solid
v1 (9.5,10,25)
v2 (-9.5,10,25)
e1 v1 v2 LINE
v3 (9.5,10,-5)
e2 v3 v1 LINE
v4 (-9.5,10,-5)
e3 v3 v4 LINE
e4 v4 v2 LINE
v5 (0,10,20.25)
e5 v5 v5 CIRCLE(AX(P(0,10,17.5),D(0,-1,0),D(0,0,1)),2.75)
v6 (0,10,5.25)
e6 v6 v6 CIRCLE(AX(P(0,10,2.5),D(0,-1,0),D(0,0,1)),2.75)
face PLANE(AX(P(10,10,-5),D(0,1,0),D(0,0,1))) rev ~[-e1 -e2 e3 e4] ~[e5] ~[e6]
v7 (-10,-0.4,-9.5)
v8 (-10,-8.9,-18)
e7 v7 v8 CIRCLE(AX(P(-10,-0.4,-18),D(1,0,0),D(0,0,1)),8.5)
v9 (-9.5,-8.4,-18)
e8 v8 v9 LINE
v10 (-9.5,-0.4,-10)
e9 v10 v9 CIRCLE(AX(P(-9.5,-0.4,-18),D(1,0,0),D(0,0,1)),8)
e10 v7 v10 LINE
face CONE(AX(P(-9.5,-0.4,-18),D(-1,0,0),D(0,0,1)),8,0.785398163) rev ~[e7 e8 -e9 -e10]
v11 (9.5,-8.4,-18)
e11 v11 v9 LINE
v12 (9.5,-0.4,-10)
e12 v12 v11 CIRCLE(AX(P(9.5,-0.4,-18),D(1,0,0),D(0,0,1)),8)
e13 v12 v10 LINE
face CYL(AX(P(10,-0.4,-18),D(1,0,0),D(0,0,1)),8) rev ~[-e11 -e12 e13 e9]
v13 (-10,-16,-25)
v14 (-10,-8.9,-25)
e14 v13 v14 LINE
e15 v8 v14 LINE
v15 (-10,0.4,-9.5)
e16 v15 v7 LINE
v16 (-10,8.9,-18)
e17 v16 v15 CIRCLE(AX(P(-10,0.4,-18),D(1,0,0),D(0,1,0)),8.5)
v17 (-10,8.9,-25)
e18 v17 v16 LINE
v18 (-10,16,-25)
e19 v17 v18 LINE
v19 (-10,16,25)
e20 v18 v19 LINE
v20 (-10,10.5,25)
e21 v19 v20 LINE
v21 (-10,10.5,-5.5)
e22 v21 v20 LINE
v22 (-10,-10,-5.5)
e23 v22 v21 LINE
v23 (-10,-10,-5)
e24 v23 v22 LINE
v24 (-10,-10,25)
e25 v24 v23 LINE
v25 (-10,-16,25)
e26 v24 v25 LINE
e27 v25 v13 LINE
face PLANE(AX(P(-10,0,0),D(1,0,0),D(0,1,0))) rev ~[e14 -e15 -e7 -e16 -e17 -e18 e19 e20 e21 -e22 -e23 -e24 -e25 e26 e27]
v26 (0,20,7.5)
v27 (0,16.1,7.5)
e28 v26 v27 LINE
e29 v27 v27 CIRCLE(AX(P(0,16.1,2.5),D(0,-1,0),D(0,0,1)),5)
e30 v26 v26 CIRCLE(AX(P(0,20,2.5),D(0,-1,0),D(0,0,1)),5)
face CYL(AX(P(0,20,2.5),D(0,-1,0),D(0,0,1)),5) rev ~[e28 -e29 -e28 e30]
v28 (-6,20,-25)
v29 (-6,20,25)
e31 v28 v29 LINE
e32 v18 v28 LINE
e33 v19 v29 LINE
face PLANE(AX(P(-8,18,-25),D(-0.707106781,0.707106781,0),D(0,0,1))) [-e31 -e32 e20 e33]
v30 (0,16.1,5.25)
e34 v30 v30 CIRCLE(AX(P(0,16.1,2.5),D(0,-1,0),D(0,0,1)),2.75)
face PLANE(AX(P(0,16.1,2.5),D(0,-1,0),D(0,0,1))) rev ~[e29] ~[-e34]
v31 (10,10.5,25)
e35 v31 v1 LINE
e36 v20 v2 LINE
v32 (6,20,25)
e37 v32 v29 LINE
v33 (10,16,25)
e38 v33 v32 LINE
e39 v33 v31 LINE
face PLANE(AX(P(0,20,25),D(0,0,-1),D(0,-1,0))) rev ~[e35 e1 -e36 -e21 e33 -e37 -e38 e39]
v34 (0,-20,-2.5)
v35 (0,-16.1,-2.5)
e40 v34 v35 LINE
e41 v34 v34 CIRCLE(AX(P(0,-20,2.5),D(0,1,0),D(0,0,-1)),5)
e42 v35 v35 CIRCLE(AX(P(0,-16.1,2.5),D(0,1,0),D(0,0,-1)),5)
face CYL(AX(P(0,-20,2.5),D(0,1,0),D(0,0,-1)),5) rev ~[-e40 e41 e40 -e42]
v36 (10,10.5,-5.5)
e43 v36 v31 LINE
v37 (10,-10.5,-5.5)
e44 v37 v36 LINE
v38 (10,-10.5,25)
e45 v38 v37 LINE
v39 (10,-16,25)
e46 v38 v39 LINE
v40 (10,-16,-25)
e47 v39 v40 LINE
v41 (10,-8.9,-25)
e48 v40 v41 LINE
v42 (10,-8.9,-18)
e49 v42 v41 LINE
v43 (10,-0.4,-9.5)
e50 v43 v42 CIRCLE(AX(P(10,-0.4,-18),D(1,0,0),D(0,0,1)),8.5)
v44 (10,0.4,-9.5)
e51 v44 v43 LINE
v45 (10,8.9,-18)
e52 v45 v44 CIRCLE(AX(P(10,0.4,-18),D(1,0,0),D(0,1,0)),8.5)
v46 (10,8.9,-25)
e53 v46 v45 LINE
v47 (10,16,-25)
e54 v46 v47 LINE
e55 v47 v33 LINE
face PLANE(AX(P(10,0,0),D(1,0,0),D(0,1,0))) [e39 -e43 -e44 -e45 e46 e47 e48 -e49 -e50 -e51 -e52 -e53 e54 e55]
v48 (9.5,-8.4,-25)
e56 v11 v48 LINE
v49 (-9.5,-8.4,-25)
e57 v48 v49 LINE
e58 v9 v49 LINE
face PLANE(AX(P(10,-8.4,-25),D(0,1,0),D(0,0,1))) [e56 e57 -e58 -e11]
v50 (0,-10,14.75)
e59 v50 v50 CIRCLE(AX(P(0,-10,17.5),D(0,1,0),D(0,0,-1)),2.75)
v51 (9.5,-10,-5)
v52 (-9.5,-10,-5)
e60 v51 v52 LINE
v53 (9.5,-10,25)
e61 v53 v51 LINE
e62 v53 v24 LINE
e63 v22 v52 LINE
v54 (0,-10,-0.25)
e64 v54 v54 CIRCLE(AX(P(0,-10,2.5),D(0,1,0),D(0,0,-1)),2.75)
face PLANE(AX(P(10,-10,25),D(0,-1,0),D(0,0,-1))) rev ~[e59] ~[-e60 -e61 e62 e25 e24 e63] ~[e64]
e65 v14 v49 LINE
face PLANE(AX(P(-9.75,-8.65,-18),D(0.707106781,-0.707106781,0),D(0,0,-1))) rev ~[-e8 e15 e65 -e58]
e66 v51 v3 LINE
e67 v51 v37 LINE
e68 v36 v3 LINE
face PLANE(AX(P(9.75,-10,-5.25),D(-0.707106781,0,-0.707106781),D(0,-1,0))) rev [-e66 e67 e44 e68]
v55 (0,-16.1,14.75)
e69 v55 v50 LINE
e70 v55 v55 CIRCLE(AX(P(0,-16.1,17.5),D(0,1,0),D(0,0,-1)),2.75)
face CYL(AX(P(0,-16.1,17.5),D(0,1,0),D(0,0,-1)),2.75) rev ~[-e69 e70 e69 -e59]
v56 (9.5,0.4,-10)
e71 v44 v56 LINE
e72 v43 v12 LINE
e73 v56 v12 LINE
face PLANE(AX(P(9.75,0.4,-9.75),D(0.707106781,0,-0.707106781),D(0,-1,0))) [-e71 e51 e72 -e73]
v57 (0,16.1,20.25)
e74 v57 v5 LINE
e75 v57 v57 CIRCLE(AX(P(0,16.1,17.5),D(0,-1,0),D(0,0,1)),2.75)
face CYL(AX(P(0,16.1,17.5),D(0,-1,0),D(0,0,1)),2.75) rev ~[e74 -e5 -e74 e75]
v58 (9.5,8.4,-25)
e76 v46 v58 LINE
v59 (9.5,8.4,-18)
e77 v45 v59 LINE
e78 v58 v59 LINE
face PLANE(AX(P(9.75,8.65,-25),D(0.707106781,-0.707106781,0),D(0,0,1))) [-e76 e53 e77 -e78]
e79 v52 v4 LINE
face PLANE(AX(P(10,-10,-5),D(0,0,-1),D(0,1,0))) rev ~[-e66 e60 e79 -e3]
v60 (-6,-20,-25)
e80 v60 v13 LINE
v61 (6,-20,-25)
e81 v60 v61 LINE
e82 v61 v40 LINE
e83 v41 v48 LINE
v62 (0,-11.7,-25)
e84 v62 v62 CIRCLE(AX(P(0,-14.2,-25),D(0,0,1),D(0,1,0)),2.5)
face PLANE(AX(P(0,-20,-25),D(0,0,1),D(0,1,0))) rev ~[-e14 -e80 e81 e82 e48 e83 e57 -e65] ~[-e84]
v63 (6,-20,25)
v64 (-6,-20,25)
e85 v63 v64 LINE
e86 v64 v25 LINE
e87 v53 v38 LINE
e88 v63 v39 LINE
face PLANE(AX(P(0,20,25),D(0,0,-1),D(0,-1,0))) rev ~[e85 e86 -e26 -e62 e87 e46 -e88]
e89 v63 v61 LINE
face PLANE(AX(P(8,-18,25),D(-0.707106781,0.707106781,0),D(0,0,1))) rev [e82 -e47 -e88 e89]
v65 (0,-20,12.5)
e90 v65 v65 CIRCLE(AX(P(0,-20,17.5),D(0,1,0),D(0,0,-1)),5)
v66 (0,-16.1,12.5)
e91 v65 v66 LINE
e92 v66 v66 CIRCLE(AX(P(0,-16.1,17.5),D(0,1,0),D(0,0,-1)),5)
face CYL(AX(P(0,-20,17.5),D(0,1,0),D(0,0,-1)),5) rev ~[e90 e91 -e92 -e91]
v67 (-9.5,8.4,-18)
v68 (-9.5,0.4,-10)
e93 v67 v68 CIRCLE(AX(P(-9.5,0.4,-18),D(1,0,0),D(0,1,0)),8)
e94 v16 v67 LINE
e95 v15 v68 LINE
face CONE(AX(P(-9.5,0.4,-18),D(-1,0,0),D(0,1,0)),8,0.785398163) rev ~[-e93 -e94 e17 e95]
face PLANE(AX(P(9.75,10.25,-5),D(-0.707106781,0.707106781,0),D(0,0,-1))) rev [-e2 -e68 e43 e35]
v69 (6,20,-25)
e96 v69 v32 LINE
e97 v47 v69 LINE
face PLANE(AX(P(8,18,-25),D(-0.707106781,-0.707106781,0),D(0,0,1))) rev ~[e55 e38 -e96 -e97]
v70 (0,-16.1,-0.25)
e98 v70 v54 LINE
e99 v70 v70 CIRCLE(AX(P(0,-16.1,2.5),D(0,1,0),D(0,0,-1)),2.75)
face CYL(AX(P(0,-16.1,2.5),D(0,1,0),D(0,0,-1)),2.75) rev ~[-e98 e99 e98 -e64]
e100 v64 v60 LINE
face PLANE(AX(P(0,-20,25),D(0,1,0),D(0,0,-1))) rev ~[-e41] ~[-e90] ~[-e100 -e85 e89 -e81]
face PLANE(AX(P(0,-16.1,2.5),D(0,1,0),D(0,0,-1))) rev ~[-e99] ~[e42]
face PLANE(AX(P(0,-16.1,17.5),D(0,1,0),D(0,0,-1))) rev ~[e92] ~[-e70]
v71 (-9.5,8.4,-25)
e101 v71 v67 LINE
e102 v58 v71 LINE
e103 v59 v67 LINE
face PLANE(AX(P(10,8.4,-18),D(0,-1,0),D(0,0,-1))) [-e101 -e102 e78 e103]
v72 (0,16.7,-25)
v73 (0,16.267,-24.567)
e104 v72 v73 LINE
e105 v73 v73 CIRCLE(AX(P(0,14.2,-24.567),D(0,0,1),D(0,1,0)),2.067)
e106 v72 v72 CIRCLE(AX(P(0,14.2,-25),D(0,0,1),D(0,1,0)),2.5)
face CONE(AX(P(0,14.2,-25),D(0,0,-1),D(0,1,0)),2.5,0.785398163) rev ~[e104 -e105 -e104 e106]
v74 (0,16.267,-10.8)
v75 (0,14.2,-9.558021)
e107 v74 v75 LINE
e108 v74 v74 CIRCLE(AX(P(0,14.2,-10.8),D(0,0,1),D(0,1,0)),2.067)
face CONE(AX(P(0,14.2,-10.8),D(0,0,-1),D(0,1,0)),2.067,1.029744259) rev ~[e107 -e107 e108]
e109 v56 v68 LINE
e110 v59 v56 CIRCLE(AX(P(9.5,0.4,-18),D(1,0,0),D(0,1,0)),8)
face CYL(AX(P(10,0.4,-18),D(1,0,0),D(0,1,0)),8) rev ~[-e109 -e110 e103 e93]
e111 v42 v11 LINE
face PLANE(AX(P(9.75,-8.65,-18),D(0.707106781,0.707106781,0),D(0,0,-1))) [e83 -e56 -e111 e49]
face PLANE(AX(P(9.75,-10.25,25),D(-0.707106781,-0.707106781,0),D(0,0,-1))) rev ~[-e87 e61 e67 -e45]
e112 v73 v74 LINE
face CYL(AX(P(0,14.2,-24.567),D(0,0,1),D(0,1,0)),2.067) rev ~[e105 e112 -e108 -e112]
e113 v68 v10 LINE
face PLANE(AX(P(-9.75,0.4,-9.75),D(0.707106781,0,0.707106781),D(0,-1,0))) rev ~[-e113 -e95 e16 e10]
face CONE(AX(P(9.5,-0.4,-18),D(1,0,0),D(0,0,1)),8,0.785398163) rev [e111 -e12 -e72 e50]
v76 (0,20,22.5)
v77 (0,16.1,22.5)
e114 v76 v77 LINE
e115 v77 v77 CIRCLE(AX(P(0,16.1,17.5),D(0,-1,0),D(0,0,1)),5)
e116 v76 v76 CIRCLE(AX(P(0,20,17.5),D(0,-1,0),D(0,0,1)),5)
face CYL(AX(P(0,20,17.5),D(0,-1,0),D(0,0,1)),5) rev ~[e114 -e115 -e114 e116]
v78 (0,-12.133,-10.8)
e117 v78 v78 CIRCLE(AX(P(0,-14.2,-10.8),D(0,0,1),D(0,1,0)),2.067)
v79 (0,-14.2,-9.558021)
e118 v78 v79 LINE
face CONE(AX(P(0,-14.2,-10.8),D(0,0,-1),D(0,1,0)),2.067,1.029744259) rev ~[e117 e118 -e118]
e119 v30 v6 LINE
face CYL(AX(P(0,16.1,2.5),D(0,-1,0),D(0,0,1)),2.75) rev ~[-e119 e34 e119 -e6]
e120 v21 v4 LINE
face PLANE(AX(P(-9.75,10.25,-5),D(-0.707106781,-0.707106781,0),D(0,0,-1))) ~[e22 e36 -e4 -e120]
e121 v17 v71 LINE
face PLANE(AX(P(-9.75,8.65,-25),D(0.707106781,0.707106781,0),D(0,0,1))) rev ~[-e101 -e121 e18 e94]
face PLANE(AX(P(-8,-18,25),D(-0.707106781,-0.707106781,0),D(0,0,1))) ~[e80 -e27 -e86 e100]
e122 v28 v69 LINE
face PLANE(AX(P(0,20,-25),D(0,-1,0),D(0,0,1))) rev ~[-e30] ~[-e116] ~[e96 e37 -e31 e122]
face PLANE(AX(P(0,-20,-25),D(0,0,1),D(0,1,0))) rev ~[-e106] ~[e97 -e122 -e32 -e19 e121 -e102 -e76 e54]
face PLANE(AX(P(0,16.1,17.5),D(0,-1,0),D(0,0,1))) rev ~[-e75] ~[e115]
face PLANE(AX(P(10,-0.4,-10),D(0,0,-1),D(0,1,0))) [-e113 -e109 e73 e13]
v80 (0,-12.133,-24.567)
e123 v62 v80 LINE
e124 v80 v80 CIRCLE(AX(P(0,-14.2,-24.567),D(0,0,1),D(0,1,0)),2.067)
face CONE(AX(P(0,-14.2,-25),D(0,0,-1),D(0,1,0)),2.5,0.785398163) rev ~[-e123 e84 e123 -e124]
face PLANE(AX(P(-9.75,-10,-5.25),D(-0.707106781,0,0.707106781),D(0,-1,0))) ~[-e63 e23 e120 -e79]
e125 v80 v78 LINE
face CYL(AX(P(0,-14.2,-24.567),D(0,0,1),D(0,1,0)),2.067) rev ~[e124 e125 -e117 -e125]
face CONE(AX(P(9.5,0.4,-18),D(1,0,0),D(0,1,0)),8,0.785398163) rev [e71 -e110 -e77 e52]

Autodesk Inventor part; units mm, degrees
ref_plane "YZ Plane" through (0, 0, 0) normal (1, 0, 0) x (0, 1, 0)
ref_plane "XZ Plane" through (0, 0, 0) normal (0, 1, 0) x (-1, 0, 0)
ref_plane "XY Plane" through (0, 0, 0) normal (0, 0, 1) x (1, 0, 0)
sketch "Skizze1" plane through (0, 0, 0) normal (1, 0, 0) x (0, 1, 0)
  line L0 (-28, 0) -> (28, 0) construction
  line L1 (0, 35) -> (0, -35) construction
  line L2 (-20, -25) -> (20, -25)
  line L3 (20, -25) -> (20, 25)
  line L4 (20, 25) -> (-20, 25)
  line L5 (-20, 25) -> (-20, -25)
  line L6 (-20, -25) -> (20, 25) construction
  line L7 (20, -25) -> (-20, 25) construction
  point P0 (0, 0)
  dimension "d0" = 40
  dimension "d1" = 50
extrude "Grundkörper" add sketch "Skizze1" along normal mid plane 20
sketch "Skizze2" plane through (10, 0, 0) normal (1, 0, 0) x (0, 0, -1)
  line L0 (-25, 20) -> (-25, -20) construction
  line L1 (0, -28) -> (0, 28) construction
  line L2 (-35, 0) -> (35, 0) construction
  line L3 (-25, -10) -> (5, -10)
  line L4 (5, -10) -> (5, 10)
  line L5 (5, 10) -> (-25, 10)
  line L6 (-25, 10) -> (-25, -10)
  line L7 (25, -20) -> (25, 20) construction
  line L8 (25, -8.4) -> (18, -8.4)
  line L9 (10, -0.4) -> (10, 0.4)
  line L10 (18, 8.4) -> (25, 8.4)
  line L11 (25, -8.4) -> (25, 8.4)
  arc A0 (10, -0.4) -> (18, -8.4) centre (18, -0.4) ccw
  arc A1 (18, 8.4) -> (10, 0.4) centre (18, 0.4) ccw
  point P0 (0, 0)
  dimension "d4" = 30
  dimension "d5" = 20
  dimension "d14" = 15
  dimension "d15" = 16.8
  dimension "d16" = 8
extrude "Ausschnitt" cut sketch "Skizze2" against normal through all
sketch "Skizze4" plane through (-10, -20, -25) normal (0, -1, 0) x (1, 0, 0)
  line L0 (20, 20) -> (0, 20) construction
  line L1 (20, 50) -> (0, 50) construction
  line L2 (10, 60) -> (10, -10) projected
  line L3 (0, 35) -> (20, 35) construction
  line L4 (0, 0) -> (0, 50) construction
  line L5 (20, 50) -> (20, 0) construction
  point P0 (10, 25)
  point P1 (10, 42.5)
  point P2 (10, 27.5)
  dimension "d19" = 30
  dimension "d20" = 15
  dimension "d21" = 15
hole "DIN7984_M5_Boh" at (0, -20, 17.5) at (0, -20, 2.5) direction (0, 1, 0) diameter 5.5 end up to surface counterbore diameter 10 counterbore depth 3.9
mirror "Spiegeln_DIN7984_M5_Boh" about plane through (0, 0, 0) normal (0, 1, 0) of "DIN7984_M5_Boh"
sketch "Skizze5" plane through (10, -20, -25) normal (0, 0, -1) x (-1, 0, 0)
  line L0 (0, 0) -> (20, 0) construction
  line L1 (20, 11.6) -> (0, 11.6) construction
  line L2 (20, 40) -> (0, 40) construction
  line L3 (0, 28.4) -> (20, 28.4) construction
  line L4 (10, -8) -> (10, 48) construction
  line L5 (-4, 20) -> (24, 20) construction
  line L6 (10, 11.6) -> (10, 0) construction
  point P0 (10, 20)
  point P1 (10, 5.8)
  point P2 (10, 34.2)
  dimension "d29" = 28.4
hole "M5x10" at (0, -14.2, -25) at (0, 14.2, -25) direction (0, 0, 1) diameter 4.134 depth 14.2 tip angle 118 countersink diameter 5 countersink angle 90 thread size "M5x0.8" class "6H" standard "ISO Metric profile"
chamfer "Fase_Allgemein" distance 4 angle 45 4 edges at (10, -20, 0) (-10, -20, 0) (10, 20, 0) (-10, 20, 0)
chamfer "Fase" distance 0.5 angle 45 15 edges at (10, -6.0569, -12.3431) (10, 0, -10) (10, 6.0569, -12.3431) (10, 8.4, -21.5) (10, -8.4, -21.5) (-10, 6.0569, -12.3431) (-10, 0, -10) (-10, -6.0569, -12.3431) (-10, -8.4, -21.5) (-10, 8.4, -21.5) (-10, 0, -5) (-10, 10, 10) (10, -10, 10) (10, 0, -5) (10, 10, 10)
equation "\"d20\" = 0.5 * d19"
equation "\"d21\" = 0.5 * d19"
properties part number "200-50-WHEEL-CONNECTOR-01" material "Aluminium 6061"
